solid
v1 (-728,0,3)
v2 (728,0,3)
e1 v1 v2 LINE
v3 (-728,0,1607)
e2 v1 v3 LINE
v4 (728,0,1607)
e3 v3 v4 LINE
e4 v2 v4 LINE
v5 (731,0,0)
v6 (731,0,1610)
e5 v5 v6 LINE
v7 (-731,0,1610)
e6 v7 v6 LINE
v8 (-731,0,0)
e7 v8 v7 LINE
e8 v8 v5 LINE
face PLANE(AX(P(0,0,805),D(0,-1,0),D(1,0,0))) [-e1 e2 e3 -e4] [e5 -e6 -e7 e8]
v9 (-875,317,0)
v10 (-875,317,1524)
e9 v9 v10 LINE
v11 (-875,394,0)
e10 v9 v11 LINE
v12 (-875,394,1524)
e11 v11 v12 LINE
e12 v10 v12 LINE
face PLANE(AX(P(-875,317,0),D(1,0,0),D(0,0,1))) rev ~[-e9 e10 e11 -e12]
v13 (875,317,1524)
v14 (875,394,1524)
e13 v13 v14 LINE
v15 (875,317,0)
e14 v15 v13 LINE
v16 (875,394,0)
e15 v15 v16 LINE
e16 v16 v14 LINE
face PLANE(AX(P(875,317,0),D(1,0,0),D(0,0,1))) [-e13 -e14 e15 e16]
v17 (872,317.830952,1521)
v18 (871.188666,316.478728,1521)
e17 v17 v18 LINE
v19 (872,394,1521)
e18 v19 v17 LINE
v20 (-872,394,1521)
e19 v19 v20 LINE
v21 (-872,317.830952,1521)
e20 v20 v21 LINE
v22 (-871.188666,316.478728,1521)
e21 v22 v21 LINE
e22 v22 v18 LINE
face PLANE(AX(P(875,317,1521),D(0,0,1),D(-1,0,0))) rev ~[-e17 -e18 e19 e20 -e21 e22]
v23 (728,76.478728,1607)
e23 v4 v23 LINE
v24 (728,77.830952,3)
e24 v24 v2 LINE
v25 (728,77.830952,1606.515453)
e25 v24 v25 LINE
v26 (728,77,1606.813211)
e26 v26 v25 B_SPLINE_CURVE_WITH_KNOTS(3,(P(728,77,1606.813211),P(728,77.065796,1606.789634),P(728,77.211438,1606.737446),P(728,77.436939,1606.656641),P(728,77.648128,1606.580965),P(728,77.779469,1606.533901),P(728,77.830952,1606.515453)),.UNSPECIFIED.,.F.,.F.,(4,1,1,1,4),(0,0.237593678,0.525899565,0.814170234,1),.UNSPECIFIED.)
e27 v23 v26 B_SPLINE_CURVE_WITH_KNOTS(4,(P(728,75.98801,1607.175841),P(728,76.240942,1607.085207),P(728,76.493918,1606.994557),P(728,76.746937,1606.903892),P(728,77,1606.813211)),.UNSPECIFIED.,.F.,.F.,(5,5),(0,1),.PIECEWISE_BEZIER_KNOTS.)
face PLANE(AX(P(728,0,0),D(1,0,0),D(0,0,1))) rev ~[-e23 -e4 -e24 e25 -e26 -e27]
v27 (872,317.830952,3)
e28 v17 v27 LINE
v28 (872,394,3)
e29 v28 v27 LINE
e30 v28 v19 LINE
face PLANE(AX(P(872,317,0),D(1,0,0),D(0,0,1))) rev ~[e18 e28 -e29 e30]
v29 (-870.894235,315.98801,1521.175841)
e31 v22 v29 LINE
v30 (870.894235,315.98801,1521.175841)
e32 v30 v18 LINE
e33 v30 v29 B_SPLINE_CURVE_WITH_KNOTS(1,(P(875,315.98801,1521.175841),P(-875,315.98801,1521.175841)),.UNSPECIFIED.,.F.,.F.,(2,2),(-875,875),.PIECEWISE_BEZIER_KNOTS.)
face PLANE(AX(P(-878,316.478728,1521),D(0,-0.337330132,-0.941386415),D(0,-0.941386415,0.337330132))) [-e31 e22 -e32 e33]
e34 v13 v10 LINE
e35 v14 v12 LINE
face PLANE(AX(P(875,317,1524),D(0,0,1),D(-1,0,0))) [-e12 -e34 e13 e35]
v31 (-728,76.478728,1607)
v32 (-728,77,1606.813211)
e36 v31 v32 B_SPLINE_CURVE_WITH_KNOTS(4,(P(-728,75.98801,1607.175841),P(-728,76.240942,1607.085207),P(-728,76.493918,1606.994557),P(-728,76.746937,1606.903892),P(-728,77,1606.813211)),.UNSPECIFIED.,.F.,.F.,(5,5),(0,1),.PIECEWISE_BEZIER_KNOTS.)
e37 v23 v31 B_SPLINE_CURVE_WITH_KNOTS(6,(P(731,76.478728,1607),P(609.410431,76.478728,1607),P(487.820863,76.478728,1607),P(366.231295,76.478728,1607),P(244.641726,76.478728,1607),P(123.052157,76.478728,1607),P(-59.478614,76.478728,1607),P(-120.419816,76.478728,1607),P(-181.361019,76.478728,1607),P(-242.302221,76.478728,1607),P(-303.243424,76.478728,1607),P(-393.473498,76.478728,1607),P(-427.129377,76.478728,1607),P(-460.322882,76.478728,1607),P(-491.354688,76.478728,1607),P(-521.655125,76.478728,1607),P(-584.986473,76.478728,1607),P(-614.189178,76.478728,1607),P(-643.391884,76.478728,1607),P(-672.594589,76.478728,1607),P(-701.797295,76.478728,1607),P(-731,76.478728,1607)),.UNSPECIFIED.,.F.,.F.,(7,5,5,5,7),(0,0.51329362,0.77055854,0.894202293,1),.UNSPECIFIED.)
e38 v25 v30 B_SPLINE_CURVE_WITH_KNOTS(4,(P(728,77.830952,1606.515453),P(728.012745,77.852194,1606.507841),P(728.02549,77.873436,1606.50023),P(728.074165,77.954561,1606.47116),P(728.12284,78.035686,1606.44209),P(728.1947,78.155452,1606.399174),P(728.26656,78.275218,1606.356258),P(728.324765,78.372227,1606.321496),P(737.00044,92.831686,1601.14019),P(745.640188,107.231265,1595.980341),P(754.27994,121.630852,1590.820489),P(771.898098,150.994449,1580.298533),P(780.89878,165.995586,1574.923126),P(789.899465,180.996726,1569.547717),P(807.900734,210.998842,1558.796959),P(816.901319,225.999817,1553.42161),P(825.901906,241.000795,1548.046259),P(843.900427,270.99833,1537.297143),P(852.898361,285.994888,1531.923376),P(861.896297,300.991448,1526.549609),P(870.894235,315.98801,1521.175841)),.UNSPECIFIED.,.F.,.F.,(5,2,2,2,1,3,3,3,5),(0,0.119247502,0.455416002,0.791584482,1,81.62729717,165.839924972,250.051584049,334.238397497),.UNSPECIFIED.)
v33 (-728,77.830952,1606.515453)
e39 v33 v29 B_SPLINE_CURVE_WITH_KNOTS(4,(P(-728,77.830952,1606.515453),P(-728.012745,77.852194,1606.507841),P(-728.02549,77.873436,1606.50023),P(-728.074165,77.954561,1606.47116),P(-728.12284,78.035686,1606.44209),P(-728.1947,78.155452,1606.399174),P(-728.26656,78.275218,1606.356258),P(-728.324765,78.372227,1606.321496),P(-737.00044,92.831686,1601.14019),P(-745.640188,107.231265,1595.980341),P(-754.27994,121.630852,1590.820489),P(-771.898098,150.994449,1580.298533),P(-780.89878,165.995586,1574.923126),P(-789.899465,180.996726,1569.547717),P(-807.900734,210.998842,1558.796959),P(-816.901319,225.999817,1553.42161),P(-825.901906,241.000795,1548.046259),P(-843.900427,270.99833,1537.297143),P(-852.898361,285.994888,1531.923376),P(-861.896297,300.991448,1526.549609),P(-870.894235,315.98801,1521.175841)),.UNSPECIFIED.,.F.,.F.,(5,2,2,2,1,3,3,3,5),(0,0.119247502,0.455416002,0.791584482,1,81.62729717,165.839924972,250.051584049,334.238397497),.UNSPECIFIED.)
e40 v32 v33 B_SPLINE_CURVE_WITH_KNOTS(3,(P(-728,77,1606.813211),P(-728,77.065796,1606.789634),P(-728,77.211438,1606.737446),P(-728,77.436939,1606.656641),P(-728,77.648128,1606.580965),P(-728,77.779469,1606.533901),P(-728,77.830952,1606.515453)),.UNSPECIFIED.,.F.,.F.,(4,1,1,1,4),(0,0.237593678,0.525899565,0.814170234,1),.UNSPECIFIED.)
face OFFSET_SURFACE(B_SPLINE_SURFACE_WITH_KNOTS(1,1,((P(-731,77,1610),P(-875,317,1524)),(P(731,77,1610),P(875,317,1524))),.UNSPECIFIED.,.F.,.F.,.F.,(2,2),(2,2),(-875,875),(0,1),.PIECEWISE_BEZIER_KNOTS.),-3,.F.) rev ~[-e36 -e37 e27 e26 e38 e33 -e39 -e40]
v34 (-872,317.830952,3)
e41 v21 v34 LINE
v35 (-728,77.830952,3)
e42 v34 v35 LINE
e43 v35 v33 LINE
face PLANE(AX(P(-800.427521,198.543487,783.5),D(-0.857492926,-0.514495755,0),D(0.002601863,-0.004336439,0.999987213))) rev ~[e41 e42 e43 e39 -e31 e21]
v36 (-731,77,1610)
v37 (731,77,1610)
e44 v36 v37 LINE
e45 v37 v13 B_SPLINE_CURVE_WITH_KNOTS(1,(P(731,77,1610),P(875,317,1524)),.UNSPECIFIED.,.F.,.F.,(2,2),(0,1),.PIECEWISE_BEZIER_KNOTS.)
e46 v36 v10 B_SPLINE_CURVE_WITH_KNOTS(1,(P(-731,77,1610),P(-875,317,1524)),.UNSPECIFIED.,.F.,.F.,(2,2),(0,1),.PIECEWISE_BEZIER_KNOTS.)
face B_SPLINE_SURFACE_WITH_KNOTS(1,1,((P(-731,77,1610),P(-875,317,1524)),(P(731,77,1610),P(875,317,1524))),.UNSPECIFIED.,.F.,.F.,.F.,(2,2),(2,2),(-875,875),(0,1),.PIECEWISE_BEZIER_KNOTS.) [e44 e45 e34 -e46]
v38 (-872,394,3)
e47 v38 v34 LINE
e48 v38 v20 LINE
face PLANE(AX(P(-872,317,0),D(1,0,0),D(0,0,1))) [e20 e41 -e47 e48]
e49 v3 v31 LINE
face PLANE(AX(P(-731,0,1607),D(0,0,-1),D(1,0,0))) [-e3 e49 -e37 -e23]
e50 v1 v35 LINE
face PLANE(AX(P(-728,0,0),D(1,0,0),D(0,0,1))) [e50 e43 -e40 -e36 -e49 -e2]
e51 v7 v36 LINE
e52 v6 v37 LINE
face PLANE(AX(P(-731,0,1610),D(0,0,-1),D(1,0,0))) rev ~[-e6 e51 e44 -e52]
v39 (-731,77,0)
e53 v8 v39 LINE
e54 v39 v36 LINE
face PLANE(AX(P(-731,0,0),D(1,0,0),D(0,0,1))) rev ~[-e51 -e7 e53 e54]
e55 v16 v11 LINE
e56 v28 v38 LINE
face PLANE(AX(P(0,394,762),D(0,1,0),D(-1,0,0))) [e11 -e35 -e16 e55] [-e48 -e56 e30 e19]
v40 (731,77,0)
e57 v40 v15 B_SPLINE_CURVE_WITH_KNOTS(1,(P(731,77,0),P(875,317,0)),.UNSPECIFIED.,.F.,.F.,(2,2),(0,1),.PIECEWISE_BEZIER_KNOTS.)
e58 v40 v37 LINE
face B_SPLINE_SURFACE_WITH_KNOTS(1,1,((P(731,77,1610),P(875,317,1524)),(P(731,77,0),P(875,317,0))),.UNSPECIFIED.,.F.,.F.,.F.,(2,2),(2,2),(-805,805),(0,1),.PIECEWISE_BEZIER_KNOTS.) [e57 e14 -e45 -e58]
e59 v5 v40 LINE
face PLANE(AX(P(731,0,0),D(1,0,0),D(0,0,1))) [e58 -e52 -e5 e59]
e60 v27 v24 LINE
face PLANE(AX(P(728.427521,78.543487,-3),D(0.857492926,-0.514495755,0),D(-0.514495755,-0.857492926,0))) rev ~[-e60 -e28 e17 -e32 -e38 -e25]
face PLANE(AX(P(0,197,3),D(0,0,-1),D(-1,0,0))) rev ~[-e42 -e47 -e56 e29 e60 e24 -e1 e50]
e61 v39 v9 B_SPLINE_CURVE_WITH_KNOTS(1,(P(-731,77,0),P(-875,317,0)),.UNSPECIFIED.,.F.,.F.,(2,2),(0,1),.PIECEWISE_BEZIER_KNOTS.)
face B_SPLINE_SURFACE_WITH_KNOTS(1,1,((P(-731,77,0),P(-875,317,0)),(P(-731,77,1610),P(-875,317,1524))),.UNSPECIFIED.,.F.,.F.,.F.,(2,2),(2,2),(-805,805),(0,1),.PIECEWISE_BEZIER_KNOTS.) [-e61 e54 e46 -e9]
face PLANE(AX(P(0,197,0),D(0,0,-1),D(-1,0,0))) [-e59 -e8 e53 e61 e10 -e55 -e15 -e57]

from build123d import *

# Parameters (mm, degrees)
F0_W        = 1462
F0_H        = 1610
F1_DEPTH    = 77
F3_W        = 1750
F3_H        = 1524
F4_DEPTH    = 77
F1_FACE_W   = 1462
F1_FACE_H   = 1610
F4_FACE_W   = 1750
F4_FACE_H   = 1524
F6_T        = 3
F6_T3_DEPTH = 1756
F6_T5_DEPTH = 1616


# Not quite as in the source:
# - a shell that OpenCascade refuses in one call is made with other operations: the cavity is built on its own and cut out


with BuildPart() as f1:
    # F0 (on Front) → F1 (new body)
    with BuildSketch(Plane.XZ):
        with Locations((0, 805)):
            Rectangle(F0_W, F0_H)
    extrude(amount=-F1_DEPTH)



with BuildPart() as f4:
    # F3 (on offset) → F4 (new body)
    with BuildSketch(Plane(origin=(0, 317, 0), x_dir=(-1, 0, 0), z_dir=(0, 1, 0))):
        with Locations((0, 762)):
            Rectangle(F3_W, F3_H)
    extrude(amount=F4_DEPTH)


with BuildPart() as f1_1:
    add(f1.part)

    add(f4.part)  # F5 merges F4
    # F1_face (on face) → F5 section 0
    with BuildSketch(Plane(origin=(0, 77, 805), x_dir=(1, 0, 0), z_dir=(0, 1, 0))):
        Rectangle(F1_FACE_W, F1_FACE_H)
    # F4_face (on face) → F5 section 1
    with BuildSketch(Plane(origin=(0, 317, 762), x_dir=(-1, 0, 0), z_dir=(0, -1, 0))):
        Rectangle(F4_FACE_W, F4_FACE_H)
    loft()

    # F6: shell of thickness 3, made by hand


with BuildPart() as f6_core1:
    # F6_t2: copy of F1
    add(f1_1.part)

    # the walls: a layer under each face that stays
    f6_faces = [f6_core1.faces().sort_by_distance(p)[0] for p in [
        (0, 197, 0),
        (875, 355.5, 762),
        (-875, 355.5, 762),
        (0, 355.5, 1524),
        (803, 197, 783.5),
        (-803, 197, 783.5),
        (-731, 38.5, 805),
        (731, 38.5, 805),
        (0, 197, 1567),
        (0, 38.5, 1610),
    ]]
    thicken(f6_faces, amount=-F6_T, mode=Mode.SUBTRACT)

    # F6_s4 → F6_t3 (cut)
    with BuildSketch(Plane.YZ.offset(-878)):
        Polygon((317.010119904, 1524.0582415924), (317, 1521), (316.4787279914, 1521), (315.988009604, 1521.1758407555), align=None)
    extrude(amount=F6_T3_DEPTH, mode=Mode.SUBTRACT)

    # F6_s6 → F6_t5 (cut)
    with BuildSketch(Plane.XY.offset(-3)):
        Polygon((731.0557247878, 76.9845651273), (728.4275212229, 78.5434872663), (728, 77.8309518948), (728, 77), align=None)
        Polygon((-731.0557247878, 76.9845651273), (-728.4275212229, 78.5434872663), (-728, 77.8309518948), (-728, 77), align=None)
    extrude(amount=F6_T5_DEPTH, mode=Mode.SUBTRACT)


with BuildPart() as f1_2:
    add(f1_1.part)

    # what is left inside the walls is the cavity
    f6_cavity = [f6_core1.part.solids().sort_by_distance(p)[0] for p in [
        (0, 393.97, 509),
    ]]
    add(f6_cavity, mode=Mode.SUBTRACT)


solid = f1_2.part
